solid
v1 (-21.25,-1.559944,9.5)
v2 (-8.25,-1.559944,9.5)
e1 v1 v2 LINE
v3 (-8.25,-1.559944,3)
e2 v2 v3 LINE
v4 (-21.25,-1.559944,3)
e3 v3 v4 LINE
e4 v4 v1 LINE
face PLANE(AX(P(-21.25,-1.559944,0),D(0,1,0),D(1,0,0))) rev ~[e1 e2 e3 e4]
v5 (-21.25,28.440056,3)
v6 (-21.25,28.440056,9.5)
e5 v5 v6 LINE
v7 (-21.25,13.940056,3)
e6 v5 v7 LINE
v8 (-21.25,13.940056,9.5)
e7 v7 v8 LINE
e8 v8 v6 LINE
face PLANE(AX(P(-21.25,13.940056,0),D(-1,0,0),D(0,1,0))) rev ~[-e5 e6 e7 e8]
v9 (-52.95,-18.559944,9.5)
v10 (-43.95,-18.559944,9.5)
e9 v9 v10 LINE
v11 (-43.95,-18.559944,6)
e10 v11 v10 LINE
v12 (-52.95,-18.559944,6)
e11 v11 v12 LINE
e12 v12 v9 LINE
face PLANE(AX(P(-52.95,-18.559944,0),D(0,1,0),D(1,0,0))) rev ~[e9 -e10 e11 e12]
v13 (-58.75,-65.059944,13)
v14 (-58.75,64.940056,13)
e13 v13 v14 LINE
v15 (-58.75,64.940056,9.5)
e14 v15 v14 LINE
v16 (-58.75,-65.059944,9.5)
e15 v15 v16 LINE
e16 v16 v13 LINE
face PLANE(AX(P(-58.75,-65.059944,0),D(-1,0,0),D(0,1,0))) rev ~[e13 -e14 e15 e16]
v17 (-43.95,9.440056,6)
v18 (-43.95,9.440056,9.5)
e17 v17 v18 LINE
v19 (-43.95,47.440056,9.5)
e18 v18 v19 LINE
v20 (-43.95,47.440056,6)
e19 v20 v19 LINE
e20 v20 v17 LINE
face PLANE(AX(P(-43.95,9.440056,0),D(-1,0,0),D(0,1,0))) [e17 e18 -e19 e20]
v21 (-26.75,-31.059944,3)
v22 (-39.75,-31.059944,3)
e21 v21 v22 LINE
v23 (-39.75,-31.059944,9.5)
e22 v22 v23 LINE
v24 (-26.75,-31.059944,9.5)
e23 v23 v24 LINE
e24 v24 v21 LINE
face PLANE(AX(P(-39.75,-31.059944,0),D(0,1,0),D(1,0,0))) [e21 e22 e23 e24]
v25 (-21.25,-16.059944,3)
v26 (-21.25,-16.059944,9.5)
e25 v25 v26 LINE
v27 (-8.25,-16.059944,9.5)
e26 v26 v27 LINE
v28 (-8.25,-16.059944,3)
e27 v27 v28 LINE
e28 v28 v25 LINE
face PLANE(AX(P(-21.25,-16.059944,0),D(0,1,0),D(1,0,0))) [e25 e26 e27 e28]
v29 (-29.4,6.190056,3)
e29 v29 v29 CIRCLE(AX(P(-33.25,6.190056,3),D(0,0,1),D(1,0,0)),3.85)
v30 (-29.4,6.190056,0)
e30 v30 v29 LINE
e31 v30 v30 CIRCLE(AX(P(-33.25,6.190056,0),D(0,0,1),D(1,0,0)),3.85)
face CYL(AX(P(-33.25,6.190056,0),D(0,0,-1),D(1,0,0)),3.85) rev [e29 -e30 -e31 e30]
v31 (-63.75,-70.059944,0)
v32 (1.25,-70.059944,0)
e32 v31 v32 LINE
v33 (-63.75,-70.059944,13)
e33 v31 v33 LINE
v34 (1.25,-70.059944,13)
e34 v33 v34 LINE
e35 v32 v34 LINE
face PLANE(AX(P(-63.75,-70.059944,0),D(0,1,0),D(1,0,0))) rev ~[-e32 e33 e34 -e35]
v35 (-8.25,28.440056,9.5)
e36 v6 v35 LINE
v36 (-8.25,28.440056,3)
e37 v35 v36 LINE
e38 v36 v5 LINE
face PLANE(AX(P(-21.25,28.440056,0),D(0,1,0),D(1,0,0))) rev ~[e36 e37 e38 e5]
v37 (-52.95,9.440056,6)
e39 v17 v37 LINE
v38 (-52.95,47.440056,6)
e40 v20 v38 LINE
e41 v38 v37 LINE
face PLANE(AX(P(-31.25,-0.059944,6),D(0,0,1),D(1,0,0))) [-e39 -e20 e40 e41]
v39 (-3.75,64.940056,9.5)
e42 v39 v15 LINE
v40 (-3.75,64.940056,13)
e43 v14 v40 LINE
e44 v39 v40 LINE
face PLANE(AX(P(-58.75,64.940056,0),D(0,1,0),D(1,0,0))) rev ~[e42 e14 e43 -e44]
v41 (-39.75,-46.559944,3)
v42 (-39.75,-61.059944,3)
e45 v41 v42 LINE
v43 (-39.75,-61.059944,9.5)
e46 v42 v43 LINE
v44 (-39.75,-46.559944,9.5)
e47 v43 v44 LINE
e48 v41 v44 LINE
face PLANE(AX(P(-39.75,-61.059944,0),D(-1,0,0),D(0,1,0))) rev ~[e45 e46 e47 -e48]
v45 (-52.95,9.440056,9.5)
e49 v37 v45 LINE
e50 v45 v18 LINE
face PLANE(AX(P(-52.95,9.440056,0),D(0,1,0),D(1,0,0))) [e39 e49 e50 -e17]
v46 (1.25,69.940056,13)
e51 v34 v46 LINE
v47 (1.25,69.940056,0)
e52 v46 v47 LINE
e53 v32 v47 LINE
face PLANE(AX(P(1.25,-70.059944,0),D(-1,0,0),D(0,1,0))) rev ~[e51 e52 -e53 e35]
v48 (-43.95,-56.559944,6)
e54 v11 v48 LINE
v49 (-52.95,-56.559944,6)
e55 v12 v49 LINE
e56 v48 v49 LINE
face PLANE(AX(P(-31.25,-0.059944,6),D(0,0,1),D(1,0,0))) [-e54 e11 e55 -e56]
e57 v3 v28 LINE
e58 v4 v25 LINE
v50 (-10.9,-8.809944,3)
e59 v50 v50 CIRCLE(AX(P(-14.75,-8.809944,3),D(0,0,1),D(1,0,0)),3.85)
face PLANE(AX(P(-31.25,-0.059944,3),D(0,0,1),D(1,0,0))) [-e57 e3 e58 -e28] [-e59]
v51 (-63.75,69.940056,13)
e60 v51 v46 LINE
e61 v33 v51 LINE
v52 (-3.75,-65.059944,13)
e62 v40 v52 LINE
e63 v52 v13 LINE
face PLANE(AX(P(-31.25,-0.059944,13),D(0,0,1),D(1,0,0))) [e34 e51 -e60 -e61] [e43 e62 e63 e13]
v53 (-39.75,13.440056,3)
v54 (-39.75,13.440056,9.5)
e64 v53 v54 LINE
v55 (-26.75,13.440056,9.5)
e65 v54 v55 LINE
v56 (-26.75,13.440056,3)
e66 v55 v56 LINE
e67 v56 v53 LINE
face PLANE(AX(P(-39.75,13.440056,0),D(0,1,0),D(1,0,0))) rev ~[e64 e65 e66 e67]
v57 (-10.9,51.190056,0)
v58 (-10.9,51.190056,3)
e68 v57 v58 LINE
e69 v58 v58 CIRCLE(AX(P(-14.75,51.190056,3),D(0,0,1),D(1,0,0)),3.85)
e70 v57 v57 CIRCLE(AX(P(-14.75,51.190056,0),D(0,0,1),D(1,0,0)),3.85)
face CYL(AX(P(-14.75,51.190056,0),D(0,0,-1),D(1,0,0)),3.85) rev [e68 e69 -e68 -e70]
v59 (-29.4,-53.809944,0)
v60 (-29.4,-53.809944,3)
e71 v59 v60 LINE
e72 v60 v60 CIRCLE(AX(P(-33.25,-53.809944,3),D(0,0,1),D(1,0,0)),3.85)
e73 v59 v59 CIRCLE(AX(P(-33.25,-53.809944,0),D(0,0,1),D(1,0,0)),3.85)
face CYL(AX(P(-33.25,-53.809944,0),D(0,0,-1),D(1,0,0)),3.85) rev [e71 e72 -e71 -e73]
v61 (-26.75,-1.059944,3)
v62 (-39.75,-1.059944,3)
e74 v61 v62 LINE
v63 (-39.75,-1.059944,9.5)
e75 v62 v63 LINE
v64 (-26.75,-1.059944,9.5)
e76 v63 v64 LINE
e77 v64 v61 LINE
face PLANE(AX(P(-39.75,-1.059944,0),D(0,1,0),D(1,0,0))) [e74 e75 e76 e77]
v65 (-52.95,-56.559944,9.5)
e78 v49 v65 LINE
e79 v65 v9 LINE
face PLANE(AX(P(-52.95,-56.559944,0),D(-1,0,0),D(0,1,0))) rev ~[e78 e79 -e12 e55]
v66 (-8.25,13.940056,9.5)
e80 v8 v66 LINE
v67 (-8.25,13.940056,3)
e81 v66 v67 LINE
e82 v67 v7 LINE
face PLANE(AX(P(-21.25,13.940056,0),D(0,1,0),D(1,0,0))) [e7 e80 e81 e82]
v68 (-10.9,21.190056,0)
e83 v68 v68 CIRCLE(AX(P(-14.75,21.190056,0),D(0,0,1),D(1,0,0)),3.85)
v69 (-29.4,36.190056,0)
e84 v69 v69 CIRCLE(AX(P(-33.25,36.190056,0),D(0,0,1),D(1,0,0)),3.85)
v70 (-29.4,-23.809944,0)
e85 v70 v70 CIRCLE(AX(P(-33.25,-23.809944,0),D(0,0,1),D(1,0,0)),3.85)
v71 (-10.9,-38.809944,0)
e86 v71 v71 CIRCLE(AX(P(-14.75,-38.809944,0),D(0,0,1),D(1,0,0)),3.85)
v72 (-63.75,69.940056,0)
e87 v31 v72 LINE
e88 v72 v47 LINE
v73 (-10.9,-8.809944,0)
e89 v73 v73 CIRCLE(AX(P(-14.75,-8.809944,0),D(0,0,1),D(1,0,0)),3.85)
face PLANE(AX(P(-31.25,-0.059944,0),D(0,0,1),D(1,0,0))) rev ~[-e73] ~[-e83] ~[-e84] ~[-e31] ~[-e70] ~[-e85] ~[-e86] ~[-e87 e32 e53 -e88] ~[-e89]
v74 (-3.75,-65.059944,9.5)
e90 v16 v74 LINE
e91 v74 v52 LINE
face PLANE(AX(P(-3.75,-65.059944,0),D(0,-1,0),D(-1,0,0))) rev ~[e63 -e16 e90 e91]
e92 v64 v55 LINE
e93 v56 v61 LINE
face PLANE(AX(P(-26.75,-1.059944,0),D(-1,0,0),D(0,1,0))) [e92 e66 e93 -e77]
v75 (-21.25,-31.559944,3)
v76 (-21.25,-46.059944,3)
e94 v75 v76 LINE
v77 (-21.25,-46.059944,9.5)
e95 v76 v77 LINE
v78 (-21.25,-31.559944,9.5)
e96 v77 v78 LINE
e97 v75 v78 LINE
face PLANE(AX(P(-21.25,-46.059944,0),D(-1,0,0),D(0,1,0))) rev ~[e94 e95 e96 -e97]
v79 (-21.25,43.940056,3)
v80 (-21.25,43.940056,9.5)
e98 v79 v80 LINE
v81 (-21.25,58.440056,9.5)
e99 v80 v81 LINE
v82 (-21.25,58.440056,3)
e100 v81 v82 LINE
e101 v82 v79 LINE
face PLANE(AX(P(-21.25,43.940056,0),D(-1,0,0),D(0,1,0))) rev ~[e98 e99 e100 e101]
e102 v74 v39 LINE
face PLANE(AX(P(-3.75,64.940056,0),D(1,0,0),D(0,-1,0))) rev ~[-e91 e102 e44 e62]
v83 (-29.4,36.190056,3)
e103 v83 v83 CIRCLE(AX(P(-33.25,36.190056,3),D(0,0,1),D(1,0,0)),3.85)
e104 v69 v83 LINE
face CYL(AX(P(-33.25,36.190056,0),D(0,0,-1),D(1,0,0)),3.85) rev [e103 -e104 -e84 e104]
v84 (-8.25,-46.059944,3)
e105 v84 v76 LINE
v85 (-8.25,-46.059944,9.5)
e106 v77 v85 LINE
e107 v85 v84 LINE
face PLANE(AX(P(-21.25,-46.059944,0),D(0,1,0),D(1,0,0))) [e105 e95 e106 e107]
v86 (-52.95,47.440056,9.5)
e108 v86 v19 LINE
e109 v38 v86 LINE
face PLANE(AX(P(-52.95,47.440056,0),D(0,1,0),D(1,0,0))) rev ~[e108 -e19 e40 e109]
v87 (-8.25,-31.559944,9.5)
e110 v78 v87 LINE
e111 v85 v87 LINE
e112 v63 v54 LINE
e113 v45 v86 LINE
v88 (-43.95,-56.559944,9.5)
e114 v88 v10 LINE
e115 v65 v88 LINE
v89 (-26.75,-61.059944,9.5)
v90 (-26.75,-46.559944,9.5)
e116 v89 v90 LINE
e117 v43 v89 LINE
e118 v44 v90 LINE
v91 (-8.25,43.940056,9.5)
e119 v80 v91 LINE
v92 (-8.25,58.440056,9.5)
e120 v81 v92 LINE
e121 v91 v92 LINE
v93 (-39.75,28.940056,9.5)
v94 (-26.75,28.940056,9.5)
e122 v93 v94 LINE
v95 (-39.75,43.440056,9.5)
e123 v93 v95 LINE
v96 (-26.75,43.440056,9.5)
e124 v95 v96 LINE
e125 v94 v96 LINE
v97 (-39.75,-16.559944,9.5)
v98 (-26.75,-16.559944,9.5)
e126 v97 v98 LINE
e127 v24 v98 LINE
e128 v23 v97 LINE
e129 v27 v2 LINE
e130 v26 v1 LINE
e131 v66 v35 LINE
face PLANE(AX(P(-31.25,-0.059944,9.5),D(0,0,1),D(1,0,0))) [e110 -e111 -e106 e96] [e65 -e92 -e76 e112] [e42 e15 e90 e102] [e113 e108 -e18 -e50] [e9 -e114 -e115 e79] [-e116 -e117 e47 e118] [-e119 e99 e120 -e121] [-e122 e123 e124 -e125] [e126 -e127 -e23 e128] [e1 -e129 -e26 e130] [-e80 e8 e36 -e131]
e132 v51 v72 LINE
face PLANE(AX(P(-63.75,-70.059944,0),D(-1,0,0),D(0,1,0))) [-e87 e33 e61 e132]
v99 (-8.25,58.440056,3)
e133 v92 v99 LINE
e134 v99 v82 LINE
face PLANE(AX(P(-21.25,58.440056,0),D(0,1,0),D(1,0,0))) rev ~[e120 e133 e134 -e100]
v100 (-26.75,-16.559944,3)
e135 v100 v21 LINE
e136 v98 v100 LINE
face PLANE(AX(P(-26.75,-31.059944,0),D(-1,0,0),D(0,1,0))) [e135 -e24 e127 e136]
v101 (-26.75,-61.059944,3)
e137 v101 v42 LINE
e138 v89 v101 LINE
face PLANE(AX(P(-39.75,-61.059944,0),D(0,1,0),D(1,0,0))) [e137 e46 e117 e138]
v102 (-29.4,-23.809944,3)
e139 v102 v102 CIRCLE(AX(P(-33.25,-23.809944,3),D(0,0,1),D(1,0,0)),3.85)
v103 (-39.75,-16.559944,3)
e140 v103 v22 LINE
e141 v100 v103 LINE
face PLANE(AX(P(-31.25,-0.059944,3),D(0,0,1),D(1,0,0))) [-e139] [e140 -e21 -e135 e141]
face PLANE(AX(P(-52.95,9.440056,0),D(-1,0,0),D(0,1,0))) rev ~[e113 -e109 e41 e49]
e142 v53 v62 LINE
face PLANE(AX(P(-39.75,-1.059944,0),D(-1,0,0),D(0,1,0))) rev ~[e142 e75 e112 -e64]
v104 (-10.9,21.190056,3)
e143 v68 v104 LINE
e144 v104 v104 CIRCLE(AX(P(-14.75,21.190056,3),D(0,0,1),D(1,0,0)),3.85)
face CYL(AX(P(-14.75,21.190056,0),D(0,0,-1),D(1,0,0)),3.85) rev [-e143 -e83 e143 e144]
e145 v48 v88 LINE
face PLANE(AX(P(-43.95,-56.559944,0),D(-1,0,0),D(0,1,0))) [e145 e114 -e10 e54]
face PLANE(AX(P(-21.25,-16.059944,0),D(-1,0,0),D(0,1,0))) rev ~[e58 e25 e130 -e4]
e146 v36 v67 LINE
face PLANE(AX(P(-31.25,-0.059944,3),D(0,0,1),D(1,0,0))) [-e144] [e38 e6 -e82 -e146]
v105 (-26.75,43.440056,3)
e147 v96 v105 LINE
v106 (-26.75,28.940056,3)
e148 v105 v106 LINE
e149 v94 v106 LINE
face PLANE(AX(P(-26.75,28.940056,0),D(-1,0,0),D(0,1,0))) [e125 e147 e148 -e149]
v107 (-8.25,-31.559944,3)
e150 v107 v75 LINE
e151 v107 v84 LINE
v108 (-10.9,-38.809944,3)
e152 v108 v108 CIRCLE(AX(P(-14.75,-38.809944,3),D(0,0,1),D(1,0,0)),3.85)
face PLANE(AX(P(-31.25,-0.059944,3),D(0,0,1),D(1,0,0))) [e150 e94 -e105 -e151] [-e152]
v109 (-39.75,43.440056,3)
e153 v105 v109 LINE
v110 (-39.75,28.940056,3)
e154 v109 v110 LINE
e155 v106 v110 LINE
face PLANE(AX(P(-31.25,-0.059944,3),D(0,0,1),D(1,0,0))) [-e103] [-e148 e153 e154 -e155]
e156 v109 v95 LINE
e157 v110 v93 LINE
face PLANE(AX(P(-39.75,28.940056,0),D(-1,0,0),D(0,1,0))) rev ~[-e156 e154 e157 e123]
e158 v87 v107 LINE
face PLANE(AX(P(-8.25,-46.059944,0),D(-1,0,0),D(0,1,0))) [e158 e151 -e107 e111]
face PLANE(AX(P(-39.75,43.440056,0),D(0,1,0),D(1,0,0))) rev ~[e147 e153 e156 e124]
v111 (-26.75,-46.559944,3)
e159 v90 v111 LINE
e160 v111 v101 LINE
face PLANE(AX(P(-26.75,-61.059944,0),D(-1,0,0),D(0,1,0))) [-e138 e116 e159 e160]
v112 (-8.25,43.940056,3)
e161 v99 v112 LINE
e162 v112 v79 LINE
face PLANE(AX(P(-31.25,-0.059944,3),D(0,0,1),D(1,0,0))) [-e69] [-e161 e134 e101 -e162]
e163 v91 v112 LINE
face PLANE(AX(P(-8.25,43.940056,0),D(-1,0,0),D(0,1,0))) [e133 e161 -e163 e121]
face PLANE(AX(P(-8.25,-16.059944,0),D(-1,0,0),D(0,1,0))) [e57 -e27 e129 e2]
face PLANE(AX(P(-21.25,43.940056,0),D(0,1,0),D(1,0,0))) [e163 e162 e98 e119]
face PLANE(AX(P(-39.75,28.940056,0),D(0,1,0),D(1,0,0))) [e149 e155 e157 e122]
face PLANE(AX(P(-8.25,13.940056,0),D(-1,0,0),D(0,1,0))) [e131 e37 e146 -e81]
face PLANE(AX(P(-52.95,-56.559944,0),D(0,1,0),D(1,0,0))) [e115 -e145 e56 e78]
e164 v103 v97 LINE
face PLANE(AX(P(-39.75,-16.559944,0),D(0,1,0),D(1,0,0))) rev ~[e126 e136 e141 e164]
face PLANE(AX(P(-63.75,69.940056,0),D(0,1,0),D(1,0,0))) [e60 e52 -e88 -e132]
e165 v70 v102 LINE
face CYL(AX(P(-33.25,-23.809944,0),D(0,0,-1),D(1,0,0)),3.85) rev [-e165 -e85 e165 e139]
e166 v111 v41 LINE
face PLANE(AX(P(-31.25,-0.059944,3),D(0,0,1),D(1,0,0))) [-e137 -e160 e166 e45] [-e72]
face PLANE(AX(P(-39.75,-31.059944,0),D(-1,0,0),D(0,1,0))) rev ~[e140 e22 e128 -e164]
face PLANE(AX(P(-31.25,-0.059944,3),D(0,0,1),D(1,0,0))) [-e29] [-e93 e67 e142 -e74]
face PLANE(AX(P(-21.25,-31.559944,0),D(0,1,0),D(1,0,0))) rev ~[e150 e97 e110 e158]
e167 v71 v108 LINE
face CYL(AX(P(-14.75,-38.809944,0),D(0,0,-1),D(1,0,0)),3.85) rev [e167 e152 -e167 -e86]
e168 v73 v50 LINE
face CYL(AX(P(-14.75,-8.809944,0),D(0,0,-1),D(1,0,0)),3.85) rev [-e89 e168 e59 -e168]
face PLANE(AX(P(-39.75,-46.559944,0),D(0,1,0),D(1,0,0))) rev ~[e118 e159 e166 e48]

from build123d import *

# Parameters (mm, degrees)
F0_W     = 65
F0_H     = 140
F0_W_2   = 9
F0_H_2   = 38
F0_W_3   = 13
F0_H_3   = 14.5
F0_R     = 3.85
F1_DEPTH = 3
F2_DEPTH = 6
F3_DEPTH = 9.5
F4_DEPTH = 13


# Not quite as in the source:
# - a feature names something its author has since deleted; it is built from what else it names


with BuildPart() as f1:
    # F0 (on Top) → F1 (new body)
    with BuildSketch(Plane.XY):
        with Locations((-31.25, -0.0599437952)):
            Rectangle(F0_W, F0_H)
        Polygon((-58.75, -65.0599437952), (-58.75, 64.9400562048), (-3.75, 64.9400562048), (-3.75, 60.4400562048), (-3.75, 49.5400562048), (-3.75, -65.0599437952), align=None, mode=Mode.SUBTRACT)
        Polygon((-3.75, 64.9400562048), (-58.75, 64.9400562048), (-58.75, -65.0599437952), (-3.75, -65.0599437952), (-3.75, 49.5400562048), (-3.75, 60.4400562048), align=None)
        with Locations((-48.45, -37.5599437952)):
            Rectangle(F0_W_2, F0_H_2, mode=Mode.SUBTRACT)
        with Locations((-33.25, -53.8099437952)):
            Rectangle(F0_W_3, F0_H_3, mode=Mode.SUBTRACT)
        with Locations((-33.25, -23.8099437952)):
            Rectangle(F0_W_3, F0_H_3, mode=Mode.SUBTRACT)
        with Locations((-14.75, -38.8099437952)):
            Rectangle(F0_W_3, F0_H_3, mode=Mode.SUBTRACT)
        with Locations((-14.75, -8.8099437952)):
            Rectangle(F0_W_3, F0_H_3, mode=Mode.SUBTRACT)
        with Locations((-48.45, 28.4400562048)):
            Rectangle(F0_W_2, F0_H_2, mode=Mode.SUBTRACT)
        with Locations((-33.25, 6.1900562048)):
            Rectangle(F0_W_3, F0_H_3, mode=Mode.SUBTRACT)
        with Locations((-33.25, 36.1900562048)):
            Rectangle(F0_W_3, F0_H_3, mode=Mode.SUBTRACT)
        with Locations((-14.75, 21.1900562048)):
            Rectangle(F0_W_3, F0_H_3, mode=Mode.SUBTRACT)
        with Locations((-14.75, 51.1900562048)):
            Rectangle(F0_W_3, F0_H_3, mode=Mode.SUBTRACT)
        with Locations((-48.45, 28.4400562048)):
            Rectangle(F0_W_2, F0_H_2)
        with Locations((-48.45, -37.5599437952)):
            Rectangle(F0_W_2, F0_H_2)
        with Locations((-14.75, 51.1900562048)):
            Rectangle(F0_W_3, F0_H_3)
        with Locations((-14.75, 51.1900562048)):
            Circle(F0_R, mode=Mode.SUBTRACT)
        with Locations((-33.25, 36.1900562048)):
            Rectangle(F0_W_3, F0_H_3)
        with Locations((-33.25, 36.1900562048)):
            Circle(F0_R, mode=Mode.SUBTRACT)
        with Locations((-14.75, 21.1900562048)):
            Rectangle(F0_W_3, F0_H_3)
        with Locations((-14.75, 21.1900562048)):
            Circle(F0_R, mode=Mode.SUBTRACT)
        with Locations((-33.25, 6.1900562048)):
            Rectangle(F0_W_3, F0_H_3)
        with Locations((-33.25, 6.1900562048)):
            Circle(F0_R, mode=Mode.SUBTRACT)
        with Locations((-14.75, -8.8099437952)):
            Rectangle(F0_W_3, F0_H_3)
        with Locations((-14.75, -8.8099437952)):
            Circle(F0_R, mode=Mode.SUBTRACT)
        with Locations((-33.25, -23.8099437952)):
            Rectangle(F0_W_3, F0_H_3)
        with Locations((-33.25, -23.8099437952)):
            Circle(F0_R, mode=Mode.SUBTRACT)
        with Locations((-33.25, -53.8099437952)):
            Rectangle(F0_W_3, F0_H_3)
        with Locations((-33.25, -53.8099437952)):
            Circle(F0_R, mode=Mode.SUBTRACT)
        with Locations((-14.75, -38.8099437952)):
            Rectangle(F0_W_3, F0_H_3)
        with Locations((-14.75, -38.8099437952)):
            Circle(F0_R, mode=Mode.SUBTRACT)
    extrude(amount=F1_DEPTH)

    # F0 (on Top) → F2 (join)
    with BuildSketch(Plane.XY):
        with Locations((-31.25, -0.0599437952)):
            Rectangle(F0_W, F0_H)
        Polygon((-58.75, -65.0599437952), (-58.75, 64.9400562048), (-3.75, 64.9400562048), (-3.75, 60.4400562048), (-3.75, 49.5400562048), (-3.75, -65.0599437952), align=None, mode=Mode.SUBTRACT)
        Polygon((-3.75, 64.9400562048), (-58.75, 64.9400562048), (-58.75, -65.0599437952), (-3.75, -65.0599437952), (-3.75, 49.5400562048), (-3.75, 60.4400562048), align=None)
        with Locations((-48.45, -37.5599437952)):
            Rectangle(F0_W_2, F0_H_2, mode=Mode.SUBTRACT)
        with Locations((-33.25, -53.8099437952)):
            Rectangle(F0_W_3, F0_H_3, mode=Mode.SUBTRACT)
        with Locations((-33.25, -23.8099437952)):
            Rectangle(F0_W_3, F0_H_3, mode=Mode.SUBTRACT)
        with Locations((-14.75, -38.8099437952)):
            Rectangle(F0_W_3, F0_H_3, mode=Mode.SUBTRACT)
        with Locations((-14.75, -8.8099437952)):
            Rectangle(F0_W_3, F0_H_3, mode=Mode.SUBTRACT)
        with Locations((-48.45, 28.4400562048)):
            Rectangle(F0_W_2, F0_H_2, mode=Mode.SUBTRACT)
        with Locations((-33.25, 6.1900562048)):
            Rectangle(F0_W_3, F0_H_3, mode=Mode.SUBTRACT)
        with Locations((-33.25, 36.1900562048)):
            Rectangle(F0_W_3, F0_H_3, mode=Mode.SUBTRACT)
        with Locations((-14.75, 21.1900562048)):
            Rectangle(F0_W_3, F0_H_3, mode=Mode.SUBTRACT)
        with Locations((-14.75, 51.1900562048)):
            Rectangle(F0_W_3, F0_H_3, mode=Mode.SUBTRACT)
        with Locations((-48.45, 28.4400562048)):
            Rectangle(F0_W_2, F0_H_2)
        with Locations((-48.45, -37.5599437952)):
            Rectangle(F0_W_2, F0_H_2)
    extrude(amount=F2_DEPTH)

    # F0 (on Top) → F3 (join)
    with BuildSketch(Plane.XY):
        with Locations((-31.25, -0.0599437952)):
            Rectangle(F0_W, F0_H)
        Polygon((-58.75, -65.0599437952), (-58.75, 64.9400562048), (-3.75, 64.9400562048), (-3.75, 60.4400562048), (-3.75, 49.5400562048), (-3.75, -65.0599437952), align=None, mode=Mode.SUBTRACT)
        Polygon((-3.75, 64.9400562048), (-58.75, 64.9400562048), (-58.75, -65.0599437952), (-3.75, -65.0599437952), (-3.75, 49.5400562048), (-3.75, 60.4400562048), align=None)
        with Locations((-48.45, -37.5599437952)):
            Rectangle(F0_W_2, F0_H_2, mode=Mode.SUBTRACT)
        with Locations((-33.25, -53.8099437952)):
            Rectangle(F0_W_3, F0_H_3, mode=Mode.SUBTRACT)
        with Locations((-33.25, -23.8099437952)):
            Rectangle(F0_W_3, F0_H_3, mode=Mode.SUBTRACT)
        with Locations((-14.75, -38.8099437952)):
            Rectangle(F0_W_3, F0_H_3, mode=Mode.SUBTRACT)
        with Locations((-14.75, -8.8099437952)):
            Rectangle(F0_W_3, F0_H_3, mode=Mode.SUBTRACT)
        with Locations((-48.45, 28.4400562048)):
            Rectangle(F0_W_2, F0_H_2, mode=Mode.SUBTRACT)
        with Locations((-33.25, 6.1900562048)):
            Rectangle(F0_W_3, F0_H_3, mode=Mode.SUBTRACT)
        with Locations((-33.25, 36.1900562048)):
            Rectangle(F0_W_3, F0_H_3, mode=Mode.SUBTRACT)
        with Locations((-14.75, 21.1900562048)):
            Rectangle(F0_W_3, F0_H_3, mode=Mode.SUBTRACT)
        with Locations((-14.75, 51.1900562048)):
            Rectangle(F0_W_3, F0_H_3, mode=Mode.SUBTRACT)
    extrude(amount=F3_DEPTH)

    # F0 (on Top) → F4 (join)
    with BuildSketch(Plane.XY):
        with Locations((-31.25, -0.0599437952)):
            Rectangle(F0_W, F0_H)
        Polygon((-58.75, -65.0599437952), (-58.75, 64.9400562048), (-3.75, 64.9400562048), (-3.75, 60.4400562048), (-3.75, 49.5400562048), (-3.75, -65.0599437952), align=None, mode=Mode.SUBTRACT)
    extrude(amount=F4_DEPTH)


solid = f1.part
